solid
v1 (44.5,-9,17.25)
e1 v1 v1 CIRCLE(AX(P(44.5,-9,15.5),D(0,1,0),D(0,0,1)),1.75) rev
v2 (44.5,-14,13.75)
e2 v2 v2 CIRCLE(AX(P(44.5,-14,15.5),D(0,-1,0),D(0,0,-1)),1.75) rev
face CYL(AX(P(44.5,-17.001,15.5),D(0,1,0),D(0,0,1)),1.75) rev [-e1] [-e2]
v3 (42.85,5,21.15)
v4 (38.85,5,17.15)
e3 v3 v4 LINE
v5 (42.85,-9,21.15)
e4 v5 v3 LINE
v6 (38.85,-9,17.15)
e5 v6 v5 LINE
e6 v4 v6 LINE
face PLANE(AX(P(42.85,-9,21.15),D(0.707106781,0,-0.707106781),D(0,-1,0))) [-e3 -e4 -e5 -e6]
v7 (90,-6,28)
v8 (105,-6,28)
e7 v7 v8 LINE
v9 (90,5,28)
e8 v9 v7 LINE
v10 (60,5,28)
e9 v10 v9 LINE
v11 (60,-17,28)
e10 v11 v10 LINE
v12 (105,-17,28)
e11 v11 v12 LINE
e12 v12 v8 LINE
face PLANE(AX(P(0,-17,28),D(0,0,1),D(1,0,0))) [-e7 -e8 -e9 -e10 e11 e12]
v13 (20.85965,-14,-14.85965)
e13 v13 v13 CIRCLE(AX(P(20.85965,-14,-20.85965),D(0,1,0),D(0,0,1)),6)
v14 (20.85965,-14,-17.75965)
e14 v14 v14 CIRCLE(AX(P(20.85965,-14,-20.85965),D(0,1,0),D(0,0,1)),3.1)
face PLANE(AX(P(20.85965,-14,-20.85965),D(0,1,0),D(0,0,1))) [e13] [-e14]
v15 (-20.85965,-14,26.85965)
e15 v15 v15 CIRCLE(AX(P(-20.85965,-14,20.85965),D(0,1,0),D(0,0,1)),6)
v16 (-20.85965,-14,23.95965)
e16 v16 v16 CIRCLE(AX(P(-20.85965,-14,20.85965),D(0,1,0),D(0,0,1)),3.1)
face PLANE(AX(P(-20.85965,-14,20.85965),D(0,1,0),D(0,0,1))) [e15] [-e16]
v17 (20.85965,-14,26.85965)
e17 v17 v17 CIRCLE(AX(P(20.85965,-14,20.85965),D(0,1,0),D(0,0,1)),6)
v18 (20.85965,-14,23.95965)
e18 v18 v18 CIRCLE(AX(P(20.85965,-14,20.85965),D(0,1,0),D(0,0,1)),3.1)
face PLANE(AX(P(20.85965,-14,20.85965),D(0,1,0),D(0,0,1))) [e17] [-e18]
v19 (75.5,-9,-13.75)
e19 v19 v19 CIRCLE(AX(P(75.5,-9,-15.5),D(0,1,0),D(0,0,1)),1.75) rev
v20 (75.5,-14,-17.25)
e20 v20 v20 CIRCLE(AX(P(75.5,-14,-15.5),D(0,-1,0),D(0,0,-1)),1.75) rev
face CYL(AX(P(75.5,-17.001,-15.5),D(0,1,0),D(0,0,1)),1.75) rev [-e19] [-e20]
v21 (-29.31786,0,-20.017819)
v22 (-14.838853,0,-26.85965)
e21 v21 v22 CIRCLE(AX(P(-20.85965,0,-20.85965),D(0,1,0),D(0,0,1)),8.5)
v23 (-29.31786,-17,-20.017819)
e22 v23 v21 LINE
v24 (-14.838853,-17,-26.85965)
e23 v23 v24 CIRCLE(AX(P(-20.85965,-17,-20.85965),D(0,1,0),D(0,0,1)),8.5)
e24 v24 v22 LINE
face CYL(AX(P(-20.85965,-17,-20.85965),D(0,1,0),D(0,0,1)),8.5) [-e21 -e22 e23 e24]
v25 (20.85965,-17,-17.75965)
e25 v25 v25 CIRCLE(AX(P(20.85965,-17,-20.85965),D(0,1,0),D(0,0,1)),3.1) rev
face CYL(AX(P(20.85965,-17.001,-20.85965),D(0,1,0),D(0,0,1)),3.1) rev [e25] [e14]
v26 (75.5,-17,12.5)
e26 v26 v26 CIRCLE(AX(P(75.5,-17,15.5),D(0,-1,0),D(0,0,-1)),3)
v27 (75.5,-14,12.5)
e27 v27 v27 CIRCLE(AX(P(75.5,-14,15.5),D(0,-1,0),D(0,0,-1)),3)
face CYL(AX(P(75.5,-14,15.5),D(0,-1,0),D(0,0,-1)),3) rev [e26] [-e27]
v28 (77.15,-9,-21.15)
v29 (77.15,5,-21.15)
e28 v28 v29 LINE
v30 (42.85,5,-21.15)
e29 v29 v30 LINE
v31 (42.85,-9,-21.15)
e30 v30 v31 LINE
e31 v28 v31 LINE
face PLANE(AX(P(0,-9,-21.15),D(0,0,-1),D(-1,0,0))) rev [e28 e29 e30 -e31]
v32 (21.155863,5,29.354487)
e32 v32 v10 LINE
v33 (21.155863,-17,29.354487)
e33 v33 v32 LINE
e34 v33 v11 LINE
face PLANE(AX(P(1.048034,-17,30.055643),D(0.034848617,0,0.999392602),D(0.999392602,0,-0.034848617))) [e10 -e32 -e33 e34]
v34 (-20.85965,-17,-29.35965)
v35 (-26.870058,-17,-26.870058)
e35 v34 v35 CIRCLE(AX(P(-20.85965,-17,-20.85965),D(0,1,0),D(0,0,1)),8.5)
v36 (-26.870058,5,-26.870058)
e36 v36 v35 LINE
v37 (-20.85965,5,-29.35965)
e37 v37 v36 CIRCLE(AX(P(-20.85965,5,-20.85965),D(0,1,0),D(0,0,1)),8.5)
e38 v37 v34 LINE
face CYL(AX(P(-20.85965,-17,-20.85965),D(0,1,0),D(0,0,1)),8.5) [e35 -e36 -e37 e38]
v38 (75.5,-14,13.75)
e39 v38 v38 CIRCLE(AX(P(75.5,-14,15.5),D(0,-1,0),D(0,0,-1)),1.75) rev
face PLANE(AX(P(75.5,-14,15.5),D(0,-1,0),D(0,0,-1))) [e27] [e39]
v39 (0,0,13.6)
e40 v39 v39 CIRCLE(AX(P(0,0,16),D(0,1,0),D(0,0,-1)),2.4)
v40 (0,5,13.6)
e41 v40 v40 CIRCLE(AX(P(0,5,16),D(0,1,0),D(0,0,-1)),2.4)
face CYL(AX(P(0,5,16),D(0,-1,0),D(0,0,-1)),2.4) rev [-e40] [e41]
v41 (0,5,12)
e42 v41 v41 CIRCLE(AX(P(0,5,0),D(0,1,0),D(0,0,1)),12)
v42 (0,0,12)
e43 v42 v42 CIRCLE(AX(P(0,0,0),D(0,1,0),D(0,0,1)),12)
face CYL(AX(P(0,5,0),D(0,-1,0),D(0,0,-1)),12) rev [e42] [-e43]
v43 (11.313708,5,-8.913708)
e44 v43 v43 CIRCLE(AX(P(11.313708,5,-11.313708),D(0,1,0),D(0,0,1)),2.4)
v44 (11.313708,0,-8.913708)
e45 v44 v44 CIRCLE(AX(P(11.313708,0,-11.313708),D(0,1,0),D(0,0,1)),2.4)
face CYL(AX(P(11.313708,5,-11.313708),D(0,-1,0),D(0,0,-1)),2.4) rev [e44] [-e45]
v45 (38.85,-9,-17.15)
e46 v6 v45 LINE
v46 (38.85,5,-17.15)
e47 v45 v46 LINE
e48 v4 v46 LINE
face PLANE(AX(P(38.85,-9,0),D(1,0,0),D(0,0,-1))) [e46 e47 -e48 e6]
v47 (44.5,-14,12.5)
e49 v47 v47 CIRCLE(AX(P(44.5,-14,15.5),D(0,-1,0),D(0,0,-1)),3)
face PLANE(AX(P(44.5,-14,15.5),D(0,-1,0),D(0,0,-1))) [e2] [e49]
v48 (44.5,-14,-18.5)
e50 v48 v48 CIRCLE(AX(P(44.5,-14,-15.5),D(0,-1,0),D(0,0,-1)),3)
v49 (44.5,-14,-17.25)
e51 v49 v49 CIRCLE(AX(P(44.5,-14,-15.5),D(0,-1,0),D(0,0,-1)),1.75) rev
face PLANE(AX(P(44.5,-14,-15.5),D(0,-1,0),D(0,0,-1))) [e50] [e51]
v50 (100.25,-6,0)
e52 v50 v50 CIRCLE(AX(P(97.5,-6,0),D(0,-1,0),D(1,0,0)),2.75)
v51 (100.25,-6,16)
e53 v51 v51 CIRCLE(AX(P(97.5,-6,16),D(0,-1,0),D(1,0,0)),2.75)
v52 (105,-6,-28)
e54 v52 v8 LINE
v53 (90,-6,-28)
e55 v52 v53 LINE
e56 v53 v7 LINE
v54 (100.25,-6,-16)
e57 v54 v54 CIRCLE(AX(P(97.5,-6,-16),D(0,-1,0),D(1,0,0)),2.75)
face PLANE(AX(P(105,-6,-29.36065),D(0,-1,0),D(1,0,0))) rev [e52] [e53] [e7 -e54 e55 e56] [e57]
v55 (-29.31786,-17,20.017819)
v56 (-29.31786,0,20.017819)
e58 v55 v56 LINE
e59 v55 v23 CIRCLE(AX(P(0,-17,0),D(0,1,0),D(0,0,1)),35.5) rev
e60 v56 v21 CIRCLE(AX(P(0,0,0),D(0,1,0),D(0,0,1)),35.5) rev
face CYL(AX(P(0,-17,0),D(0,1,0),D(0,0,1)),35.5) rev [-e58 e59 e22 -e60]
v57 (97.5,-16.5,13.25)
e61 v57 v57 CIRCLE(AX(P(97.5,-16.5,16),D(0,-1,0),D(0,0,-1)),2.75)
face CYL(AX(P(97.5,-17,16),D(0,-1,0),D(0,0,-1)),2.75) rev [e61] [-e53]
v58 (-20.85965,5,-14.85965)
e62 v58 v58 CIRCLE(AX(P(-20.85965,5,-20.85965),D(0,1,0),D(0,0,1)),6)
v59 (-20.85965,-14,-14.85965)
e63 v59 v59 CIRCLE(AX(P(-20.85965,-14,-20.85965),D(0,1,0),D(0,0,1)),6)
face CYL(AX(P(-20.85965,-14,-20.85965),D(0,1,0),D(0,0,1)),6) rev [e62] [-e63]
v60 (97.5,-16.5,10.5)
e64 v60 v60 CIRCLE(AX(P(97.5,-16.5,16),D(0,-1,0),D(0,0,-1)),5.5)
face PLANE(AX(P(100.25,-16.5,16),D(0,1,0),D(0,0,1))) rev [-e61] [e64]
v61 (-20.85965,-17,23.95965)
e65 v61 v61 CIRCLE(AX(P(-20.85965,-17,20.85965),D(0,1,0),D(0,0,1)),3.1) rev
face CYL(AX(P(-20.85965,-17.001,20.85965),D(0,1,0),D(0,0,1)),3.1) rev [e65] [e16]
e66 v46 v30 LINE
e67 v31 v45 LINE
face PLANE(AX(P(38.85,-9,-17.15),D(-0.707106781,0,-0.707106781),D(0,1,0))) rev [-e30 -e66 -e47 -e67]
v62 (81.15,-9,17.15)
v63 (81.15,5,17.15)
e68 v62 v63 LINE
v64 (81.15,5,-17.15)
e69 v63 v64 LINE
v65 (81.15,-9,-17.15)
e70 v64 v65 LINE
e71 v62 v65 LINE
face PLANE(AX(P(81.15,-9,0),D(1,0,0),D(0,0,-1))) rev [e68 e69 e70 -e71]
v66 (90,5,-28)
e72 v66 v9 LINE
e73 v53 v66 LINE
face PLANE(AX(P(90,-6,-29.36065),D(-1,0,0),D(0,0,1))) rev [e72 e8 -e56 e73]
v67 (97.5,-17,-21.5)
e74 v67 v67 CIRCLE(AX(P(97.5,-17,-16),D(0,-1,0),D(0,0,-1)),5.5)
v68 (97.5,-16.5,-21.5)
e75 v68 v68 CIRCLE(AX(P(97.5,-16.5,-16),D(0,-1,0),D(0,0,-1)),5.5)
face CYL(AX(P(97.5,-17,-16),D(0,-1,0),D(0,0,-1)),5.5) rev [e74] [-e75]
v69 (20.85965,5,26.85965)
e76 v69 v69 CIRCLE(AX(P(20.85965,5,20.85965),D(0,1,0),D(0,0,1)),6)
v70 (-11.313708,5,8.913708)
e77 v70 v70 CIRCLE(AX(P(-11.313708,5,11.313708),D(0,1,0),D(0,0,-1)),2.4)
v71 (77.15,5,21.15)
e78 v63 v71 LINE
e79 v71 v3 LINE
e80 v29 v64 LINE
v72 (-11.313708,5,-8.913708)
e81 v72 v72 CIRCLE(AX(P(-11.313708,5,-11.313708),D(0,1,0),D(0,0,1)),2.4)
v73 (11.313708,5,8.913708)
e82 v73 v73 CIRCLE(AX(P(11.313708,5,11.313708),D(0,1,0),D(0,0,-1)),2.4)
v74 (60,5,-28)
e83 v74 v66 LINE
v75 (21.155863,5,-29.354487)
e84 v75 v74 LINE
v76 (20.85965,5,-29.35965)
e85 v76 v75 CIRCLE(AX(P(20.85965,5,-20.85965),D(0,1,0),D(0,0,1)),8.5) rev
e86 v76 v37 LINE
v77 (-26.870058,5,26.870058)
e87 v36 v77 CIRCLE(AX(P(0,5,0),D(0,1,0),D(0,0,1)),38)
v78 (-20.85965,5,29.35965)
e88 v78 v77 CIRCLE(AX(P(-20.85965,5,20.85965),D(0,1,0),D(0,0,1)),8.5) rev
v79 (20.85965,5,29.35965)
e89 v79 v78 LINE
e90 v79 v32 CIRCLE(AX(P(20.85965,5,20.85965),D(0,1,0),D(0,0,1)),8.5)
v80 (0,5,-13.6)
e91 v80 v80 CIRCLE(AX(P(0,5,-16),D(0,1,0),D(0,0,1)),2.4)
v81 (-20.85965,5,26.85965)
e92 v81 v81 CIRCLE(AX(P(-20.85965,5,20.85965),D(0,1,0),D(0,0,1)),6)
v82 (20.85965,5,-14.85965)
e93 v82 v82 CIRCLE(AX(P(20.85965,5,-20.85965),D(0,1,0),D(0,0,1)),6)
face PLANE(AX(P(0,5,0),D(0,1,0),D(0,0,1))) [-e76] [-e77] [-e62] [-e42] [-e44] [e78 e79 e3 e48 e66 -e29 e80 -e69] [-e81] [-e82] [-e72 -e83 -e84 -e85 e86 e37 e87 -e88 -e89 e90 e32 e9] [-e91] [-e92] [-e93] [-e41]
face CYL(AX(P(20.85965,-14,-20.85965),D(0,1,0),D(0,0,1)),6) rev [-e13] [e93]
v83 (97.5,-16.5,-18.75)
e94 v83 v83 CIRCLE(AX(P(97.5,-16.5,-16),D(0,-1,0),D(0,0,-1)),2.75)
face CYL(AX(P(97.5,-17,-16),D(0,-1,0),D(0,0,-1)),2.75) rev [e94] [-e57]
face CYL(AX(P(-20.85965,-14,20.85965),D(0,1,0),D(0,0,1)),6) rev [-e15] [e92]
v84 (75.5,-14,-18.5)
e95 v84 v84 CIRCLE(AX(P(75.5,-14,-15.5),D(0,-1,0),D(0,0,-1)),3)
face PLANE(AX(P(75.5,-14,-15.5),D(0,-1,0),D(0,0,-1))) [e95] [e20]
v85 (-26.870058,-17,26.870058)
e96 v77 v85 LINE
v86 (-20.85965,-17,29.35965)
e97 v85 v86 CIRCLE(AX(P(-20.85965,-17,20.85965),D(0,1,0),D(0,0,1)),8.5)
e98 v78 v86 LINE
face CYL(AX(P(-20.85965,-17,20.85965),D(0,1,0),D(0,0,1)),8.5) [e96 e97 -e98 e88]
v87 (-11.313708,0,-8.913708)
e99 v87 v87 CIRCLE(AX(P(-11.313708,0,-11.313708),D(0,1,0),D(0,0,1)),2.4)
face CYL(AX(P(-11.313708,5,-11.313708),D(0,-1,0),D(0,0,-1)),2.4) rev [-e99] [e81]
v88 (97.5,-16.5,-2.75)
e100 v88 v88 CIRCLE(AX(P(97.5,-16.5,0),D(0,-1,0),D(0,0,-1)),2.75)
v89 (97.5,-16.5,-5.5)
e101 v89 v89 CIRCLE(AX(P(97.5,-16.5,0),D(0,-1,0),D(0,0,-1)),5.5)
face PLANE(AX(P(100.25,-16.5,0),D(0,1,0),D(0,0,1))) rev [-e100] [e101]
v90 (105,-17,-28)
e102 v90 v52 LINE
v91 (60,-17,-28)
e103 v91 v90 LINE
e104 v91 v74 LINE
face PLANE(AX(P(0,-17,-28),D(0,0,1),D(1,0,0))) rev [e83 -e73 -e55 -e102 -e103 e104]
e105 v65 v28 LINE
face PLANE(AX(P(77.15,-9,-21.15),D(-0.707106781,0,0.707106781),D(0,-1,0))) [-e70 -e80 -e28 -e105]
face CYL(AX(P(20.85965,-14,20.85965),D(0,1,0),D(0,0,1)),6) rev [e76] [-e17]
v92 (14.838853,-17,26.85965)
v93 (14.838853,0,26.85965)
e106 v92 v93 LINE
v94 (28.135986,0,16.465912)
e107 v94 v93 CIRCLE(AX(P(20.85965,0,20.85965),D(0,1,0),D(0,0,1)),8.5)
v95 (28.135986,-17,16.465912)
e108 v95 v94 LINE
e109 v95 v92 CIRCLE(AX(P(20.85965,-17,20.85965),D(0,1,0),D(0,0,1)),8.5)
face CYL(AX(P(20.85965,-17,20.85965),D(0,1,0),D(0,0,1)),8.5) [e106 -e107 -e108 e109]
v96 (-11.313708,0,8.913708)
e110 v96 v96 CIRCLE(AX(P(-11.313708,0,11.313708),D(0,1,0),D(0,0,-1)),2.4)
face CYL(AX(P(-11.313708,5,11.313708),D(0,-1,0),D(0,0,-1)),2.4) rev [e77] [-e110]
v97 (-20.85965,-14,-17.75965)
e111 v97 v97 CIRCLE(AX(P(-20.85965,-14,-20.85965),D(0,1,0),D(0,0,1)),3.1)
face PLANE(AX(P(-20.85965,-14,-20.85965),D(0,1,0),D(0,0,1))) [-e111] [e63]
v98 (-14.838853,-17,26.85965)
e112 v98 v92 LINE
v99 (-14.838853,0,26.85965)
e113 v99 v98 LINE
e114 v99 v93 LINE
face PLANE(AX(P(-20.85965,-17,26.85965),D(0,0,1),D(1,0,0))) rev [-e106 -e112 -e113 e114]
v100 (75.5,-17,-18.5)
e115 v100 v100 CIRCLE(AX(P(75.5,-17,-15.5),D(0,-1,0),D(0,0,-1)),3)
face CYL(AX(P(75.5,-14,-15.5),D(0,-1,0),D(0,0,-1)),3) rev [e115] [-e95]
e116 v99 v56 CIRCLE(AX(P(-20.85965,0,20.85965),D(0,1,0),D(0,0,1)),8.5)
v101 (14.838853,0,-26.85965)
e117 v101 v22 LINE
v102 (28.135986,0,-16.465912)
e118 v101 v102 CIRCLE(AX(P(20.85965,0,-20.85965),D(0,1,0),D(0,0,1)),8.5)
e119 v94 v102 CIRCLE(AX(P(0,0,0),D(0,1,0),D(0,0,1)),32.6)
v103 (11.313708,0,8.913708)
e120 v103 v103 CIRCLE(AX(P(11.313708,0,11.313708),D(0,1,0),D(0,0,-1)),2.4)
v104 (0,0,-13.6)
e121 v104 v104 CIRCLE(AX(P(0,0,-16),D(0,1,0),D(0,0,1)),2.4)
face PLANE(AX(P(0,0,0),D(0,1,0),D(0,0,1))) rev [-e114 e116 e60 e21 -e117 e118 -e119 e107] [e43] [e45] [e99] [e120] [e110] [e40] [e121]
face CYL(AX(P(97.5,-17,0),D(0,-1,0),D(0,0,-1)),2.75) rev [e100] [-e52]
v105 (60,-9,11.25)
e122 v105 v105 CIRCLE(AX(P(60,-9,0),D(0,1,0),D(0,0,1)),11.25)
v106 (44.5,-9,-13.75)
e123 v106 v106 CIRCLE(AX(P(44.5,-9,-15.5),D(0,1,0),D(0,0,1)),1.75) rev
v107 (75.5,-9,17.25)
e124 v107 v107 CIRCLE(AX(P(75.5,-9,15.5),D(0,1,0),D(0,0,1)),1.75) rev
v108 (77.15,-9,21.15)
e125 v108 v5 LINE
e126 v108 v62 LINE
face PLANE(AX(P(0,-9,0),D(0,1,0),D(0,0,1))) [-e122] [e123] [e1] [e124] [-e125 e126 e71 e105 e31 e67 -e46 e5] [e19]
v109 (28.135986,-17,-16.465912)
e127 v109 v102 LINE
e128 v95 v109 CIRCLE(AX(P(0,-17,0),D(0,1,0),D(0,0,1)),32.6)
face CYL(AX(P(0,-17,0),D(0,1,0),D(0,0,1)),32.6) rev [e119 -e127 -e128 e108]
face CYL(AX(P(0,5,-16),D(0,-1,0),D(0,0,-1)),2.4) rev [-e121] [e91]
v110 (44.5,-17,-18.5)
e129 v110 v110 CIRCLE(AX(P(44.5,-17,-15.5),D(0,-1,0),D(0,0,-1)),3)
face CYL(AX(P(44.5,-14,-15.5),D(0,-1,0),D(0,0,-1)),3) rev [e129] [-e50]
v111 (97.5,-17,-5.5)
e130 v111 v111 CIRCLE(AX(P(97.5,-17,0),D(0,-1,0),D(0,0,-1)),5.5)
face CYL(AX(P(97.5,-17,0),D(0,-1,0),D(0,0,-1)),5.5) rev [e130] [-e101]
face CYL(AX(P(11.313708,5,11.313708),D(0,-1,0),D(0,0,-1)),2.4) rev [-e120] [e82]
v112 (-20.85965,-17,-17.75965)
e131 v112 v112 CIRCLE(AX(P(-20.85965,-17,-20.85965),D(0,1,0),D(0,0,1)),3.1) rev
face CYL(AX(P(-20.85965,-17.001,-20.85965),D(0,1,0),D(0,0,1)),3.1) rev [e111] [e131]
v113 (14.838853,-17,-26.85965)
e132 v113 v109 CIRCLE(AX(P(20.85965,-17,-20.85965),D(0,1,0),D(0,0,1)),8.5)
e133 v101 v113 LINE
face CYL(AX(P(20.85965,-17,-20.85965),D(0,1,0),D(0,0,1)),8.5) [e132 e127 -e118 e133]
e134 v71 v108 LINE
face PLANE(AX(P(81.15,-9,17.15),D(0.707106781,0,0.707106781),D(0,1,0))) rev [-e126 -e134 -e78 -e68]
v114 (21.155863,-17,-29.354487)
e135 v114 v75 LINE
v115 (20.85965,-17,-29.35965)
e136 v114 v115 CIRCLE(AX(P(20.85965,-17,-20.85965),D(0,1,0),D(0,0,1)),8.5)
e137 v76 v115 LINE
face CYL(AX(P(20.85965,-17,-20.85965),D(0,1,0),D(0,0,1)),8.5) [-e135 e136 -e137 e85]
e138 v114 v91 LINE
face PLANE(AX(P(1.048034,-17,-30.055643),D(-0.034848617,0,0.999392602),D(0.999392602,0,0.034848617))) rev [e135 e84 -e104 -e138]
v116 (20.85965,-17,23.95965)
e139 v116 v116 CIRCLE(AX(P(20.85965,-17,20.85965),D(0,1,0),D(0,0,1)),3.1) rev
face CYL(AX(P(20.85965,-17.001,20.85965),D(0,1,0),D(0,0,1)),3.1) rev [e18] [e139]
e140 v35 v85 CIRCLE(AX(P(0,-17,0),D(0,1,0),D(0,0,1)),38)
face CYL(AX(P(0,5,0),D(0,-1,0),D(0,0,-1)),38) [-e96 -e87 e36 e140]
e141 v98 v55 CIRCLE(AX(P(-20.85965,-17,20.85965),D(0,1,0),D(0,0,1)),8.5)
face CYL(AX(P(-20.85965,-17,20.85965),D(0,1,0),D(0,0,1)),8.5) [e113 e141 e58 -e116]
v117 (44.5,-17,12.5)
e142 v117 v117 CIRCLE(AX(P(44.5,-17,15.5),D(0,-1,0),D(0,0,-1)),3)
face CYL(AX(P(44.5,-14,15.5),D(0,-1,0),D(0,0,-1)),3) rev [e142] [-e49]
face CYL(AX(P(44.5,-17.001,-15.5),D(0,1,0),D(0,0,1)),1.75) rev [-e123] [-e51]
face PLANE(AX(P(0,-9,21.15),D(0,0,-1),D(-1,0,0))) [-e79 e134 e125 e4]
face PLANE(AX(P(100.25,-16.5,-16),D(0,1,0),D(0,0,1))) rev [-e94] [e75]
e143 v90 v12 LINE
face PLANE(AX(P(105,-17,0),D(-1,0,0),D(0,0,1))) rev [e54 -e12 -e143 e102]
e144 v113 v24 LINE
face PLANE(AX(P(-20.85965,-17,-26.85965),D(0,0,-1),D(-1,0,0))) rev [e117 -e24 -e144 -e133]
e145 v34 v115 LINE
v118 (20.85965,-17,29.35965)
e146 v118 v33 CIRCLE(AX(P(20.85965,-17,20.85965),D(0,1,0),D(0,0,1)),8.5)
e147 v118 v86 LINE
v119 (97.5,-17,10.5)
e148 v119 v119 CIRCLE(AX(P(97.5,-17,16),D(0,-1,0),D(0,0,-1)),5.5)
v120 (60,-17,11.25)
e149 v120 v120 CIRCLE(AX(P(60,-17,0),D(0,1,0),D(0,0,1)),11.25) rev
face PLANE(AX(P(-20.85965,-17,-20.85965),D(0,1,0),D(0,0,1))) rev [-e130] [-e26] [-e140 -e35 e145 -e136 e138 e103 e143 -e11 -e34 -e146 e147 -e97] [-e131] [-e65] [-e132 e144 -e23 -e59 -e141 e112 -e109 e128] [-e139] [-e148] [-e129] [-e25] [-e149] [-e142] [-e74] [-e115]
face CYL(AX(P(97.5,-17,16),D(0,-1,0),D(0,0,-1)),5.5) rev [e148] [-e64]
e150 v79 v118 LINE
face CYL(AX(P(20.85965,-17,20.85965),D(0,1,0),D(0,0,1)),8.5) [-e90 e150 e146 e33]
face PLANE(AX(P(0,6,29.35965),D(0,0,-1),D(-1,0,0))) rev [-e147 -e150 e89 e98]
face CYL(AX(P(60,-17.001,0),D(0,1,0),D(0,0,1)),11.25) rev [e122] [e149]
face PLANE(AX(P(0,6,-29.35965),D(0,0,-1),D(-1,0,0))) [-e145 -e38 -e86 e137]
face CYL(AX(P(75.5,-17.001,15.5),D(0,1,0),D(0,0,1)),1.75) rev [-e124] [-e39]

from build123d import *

# Parameters (mm, degrees)
SKETCH_1_R                   = 38
SKETCH_1_R_2                 = 12
SKETCH_1_R_3                 = 2.4
SKETCH_1_R_4                 = 3.1
EXTRUDE_1_DEPTH              = 5
SKETCH_2_R                   = 8.5
EXTRUDE_2_DEPTH              = 17
SKETCH_3_R                   = 6
CUT_EXTRUDE_1_DEPTH          = 19
CUT_EXTRUDE_2_REACH          = 59
SKETCH_4_R                   = 3.1
CUT_EXTRUDE_START            = 6
CUT_EXTRUDE_3_DEPTH          = 6
EXTRUDE_START                = -22
EXTRUDE_5_DEPTH              = 22
SKETCH_9_W                   = 41.71930009
SKETCH_9_H                   = 2.5
EXTRUDE_6_DEPTH              = 17
CUT_EXTRUDE_4_REACH          = 122.848
SKETCH_10_W                  = 15
SKETCH_10_H                  = 11
SKETCH_11_W                  = 42.3
SKETCH_11_H                  = 42.3
SKETCH_11_R                  = 11.25
CUT_EXTRUDE_5_DEPTH          = 14
CUT_EXTRUDE_6_REACH          = 113.225
SKETCH_11_2_R                = 1.75
SKETCH_11_2_R_2              = 11.25
CHAMFER_2_SIZE               = 4
HOLE_WIZARD_M5_2_D           = 5.5
HOLE_WIZARD_M5_2_CBORE_D     = 11
HOLE_WIZARD_M5_2_CBORE_DEPTH = 0.5
SKETCH_13_R                  = 3
CUT_EXTRUDE_7_DEPTH          = 3


# Read off the part's stored shape, not the designer's step: 凸台-拉伸5
with BuildPart() as part:
    # 草图1 → 凸台-拉伸1 (new body)
    with BuildSketch(Plane(origin=(0, 0, 0), x_dir=(1, 0, 0), z_dir=(0, 1, 0))):
        with Locations(Location((0, 0, 0), (0, 0, 270))):
            Circle(SKETCH_1_R)
        with Locations(Location((0, 0, 0), (0, 0, 270))):
            Circle(SKETCH_1_R_2, mode=Mode.SUBTRACT)
        with Locations(Location((-11.313708499, 11.313708499, 0), (0, 0, 270))):
            Circle(SKETCH_1_R_3, mode=Mode.SUBTRACT)
        with Locations(Location((0, 16, 0), (0, 0, 270))):
            Circle(SKETCH_1_R_3, mode=Mode.SUBTRACT)
        with Locations(Location((11.313708499, 11.313708499, 0), (0, 0, 270))):
            Circle(SKETCH_1_R_3, mode=Mode.SUBTRACT)
        with Locations(Location((11.313708499, -11.313708499, 0), (0, 0, 90))):
            Circle(SKETCH_1_R_3, mode=Mode.SUBTRACT)
        with Locations(Location((-11.313708499, -11.313708499, 0), (0, 0, 90))):
            Circle(SKETCH_1_R_3, mode=Mode.SUBTRACT)
        with Locations(Location((0, -16, 0), (0, 0, 90))):
            Circle(SKETCH_1_R_3, mode=Mode.SUBTRACT)
        with Locations(Location((-20.859650045, 20.859650045, 0), (0, 0, 270))):
            Circle(SKETCH_1_R_4, mode=Mode.SUBTRACT)
        with Locations(Location((20.859650045, 20.859650045, 0), (0, 0, 270))):
            Circle(SKETCH_1_R_4, mode=Mode.SUBTRACT)
        with Locations(Location((20.859650045, -20.859650045, 0), (0, 0, 270))):
            Circle(SKETCH_1_R_4, mode=Mode.SUBTRACT)
        with Locations(Location((-20.859650045, -20.859650045, 0), (0, 0, 270))):
            Circle(SKETCH_1_R_4, mode=Mode.SUBTRACT)
    extrude(amount=EXTRUDE_1_DEPTH)

    # 草图2 → 凸台-拉伸2 (add)
    with BuildSketch(Plane(origin=(0, 0, 0), x_dir=(1, 0, 0), z_dir=(0, 1, 0))):
        with Locations(Location((-20.859650045, 20.859650045, 0), (0, 0, 270))):
            Circle(SKETCH_2_R)
        with Locations(Location((20.859650045, 20.859650045, 0), (0, 0, 270))):
            Circle(SKETCH_2_R)
        with Locations(Location((20.859650045, -20.859650045, 0), (0, 0, 270))):
            Circle(SKETCH_2_R)
        with Locations(Location((-20.859650045, -20.859650045, 0), (0, 0, 270))):
            Circle(SKETCH_2_R)
    extrude(amount=-EXTRUDE_2_DEPTH)

    # 草图3 → 切除-拉伸1 (cut)
    with BuildSketch(Plane(origin=(0, 5, 0), x_dir=(1, 0, 0), z_dir=(0, 1, 0))):
        with Locations(Location((-20.859650045, 20.859650045, 0), (0, 0, 270))):
            Circle(SKETCH_3_R)
        with Locations(Location((20.859650045, 20.859650045, 0), (0, 0, 270))):
            Circle(SKETCH_3_R)
        with Locations(Location((20.859650045, -20.859650045, 0), (0, 0, 270))):
            Circle(SKETCH_3_R)
        with Locations(Location((-20.859650045, -20.859650045, 0), (0, 0, 270))):
            Circle(SKETCH_3_R)
    extrude(amount=-CUT_EXTRUDE_1_DEPTH, mode=Mode.SUBTRACT)

    # 草图4 → 切除-拉伸2 (cut, up to next)
    with BuildSketch(Plane(origin=(0, -14, 0), x_dir=(1, 0, 0), z_dir=(0, 1, 0)), mode=Mode.PRIVATE) as cut_extrude_2_sk1:
        with Locations(Location((-20.859650045, 20.859650045, 0), (0, 0, 270))):
            Circle(SKETCH_4_R)
    cut_extrude_2_tool1 = extrude(cut_extrude_2_sk1.sketch, amount=-CUT_EXTRUDE_2_REACH, mode=Mode.PRIVATE) & part.part
    # 草图4 → 切除-拉伸2 (cut, up to next)
    with BuildSketch(Plane(origin=(0, -14, 0), x_dir=(1, 0, 0), z_dir=(0, 1, 0)), mode=Mode.PRIVATE) as cut_extrude_2_sk2:
        with Locations(Location((20.859650045, 20.859650045, 0), (0, 0, 270))):
            Circle(SKETCH_4_R)
    cut_extrude_2_tool2 = extrude(cut_extrude_2_sk2.sketch, amount=-CUT_EXTRUDE_2_REACH, mode=Mode.PRIVATE) & part.part
    # 草图4 → 切除-拉伸2 (cut, up to next)
    with BuildSketch(Plane(origin=(0, -14, 0), x_dir=(1, 0, 0), z_dir=(0, 1, 0)), mode=Mode.PRIVATE) as cut_extrude_2_sk3:
        with Locations(Location((20.859650045, -20.859650045, 0), (0, 0, 270))):
            Circle(SKETCH_4_R)
    cut_extrude_2_tool3 = extrude(cut_extrude_2_sk3.sketch, amount=-CUT_EXTRUDE_2_REACH, mode=Mode.PRIVATE) & part.part
    # 草图4 → 切除-拉伸2 (cut, up to next)
    with BuildSketch(Plane(origin=(0, -14, 0), x_dir=(1, 0, 0), z_dir=(0, 1, 0)), mode=Mode.PRIVATE) as cut_extrude_2_sk4:
        with Locations(Location((-20.859650045, -20.859650045, 0), (0, 0, 270))):
            Circle(SKETCH_4_R)
    cut_extrude_2_tool4 = extrude(cut_extrude_2_sk4.sketch, amount=-CUT_EXTRUDE_2_REACH, mode=Mode.PRIVATE) & part.part
    add(cut_extrude_2_tool1.solids().sort_by_distance((-20.85965, -14, -20.85965))[0], mode=Mode.SUBTRACT)
    add(cut_extrude_2_tool2.solids().sort_by_distance((20.85965, -14, -20.85965))[0], mode=Mode.SUBTRACT)
    add(cut_extrude_2_tool3.solids().sort_by_distance((20.85965, -14, 20.85965))[0], mode=Mode.SUBTRACT)
    add(cut_extrude_2_tool4.solids().sort_by_distance((-20.85965, -14, 20.85965))[0], mode=Mode.SUBTRACT)

    # 草图7 → 切除-拉伸3 (cut)
    with BuildSketch(Plane(origin=(0, 0, 0), x_dir=(1, 0, 0), z_dir=(0, 1, 0)).offset(CUT_EXTRUDE_START)):
        with BuildLine():
            Line((-20.859650045, -29.359650045), (20.859650045, -29.359650045))
            ThreePointArc((20.859650045, -29.359650045), (24.11245922, -28.712626071), (26.870057685, -26.870057685))
            ThreePointArc((26.870057685, -26.870057685), (0, -38), (-26.870057685, -26.870057685))
            ThreePointArc((-26.870057685, -26.870057685), (-24.11245922, -28.712626071), (-20.859650045, -29.359650045))
        make_face()
        with BuildLine():
            Line((-20.859650045, 29.359650045), (20.859650045, 29.359650045))
            ThreePointArc((20.859650045, 29.359650045), (24.11245922, 28.712626071), (26.870057685, 26.870057685))
            ThreePointArc((26.870057685, 26.870057685), (0, 38), (-26.870057685, 26.870057685))
            ThreePointArc((-26.870057685, 26.870057685), (-24.11245922, 28.712626071), (-20.859650045, 29.359650045))
        make_face()
    extrude(amount=-CUT_EXTRUDE_3_DEPTH, mode=Mode.SUBTRACT)

    # 凸台-拉伸5 outline → 凸台-拉伸5 (add)
    with BuildSketch(Plane(origin=(0, 5, 0), x_dir=(1, 0, 0), z_dir=(0, 1, 0)).offset(EXTRUDE_START)):
        with BuildLine():
            ThreePointArc((-26.870057685, 26.870057685), (-38, 0), (-26.870057685, -26.870057685))
            ThreePointArc((-26.870057685, -26.870057685), (-28.864243736, -23.719104512), (-29.317860266, -20.017818797))
            ThreePointArc((-29.317860266, -20.017818797), (-35.5, 0), (-29.317860266, 20.017818797))
            ThreePointArc((-29.317860266, 20.017818797), (-28.864243736, 23.719104512), (-26.870057685, 26.870057685))
        make_face()
        with BuildLine():
            ThreePointArc((28.135986341, 16.465912444), (32.6, 0), (28.135986341, -16.465912444))
            ThreePointArc((28.135986341, -16.465912444), (28.333920326, -24.907524026), (21.155863292, -29.354487166))
            Line((21.155863292, -29.354487166), (60, -28))
            Line((60, -28), (105, -28))
            Line((105, -28), (105, 28))
            Line((105, 28), (60, 28))
            Line((60, 28), (21.155863292, 29.354487166))
            ThreePointArc((21.155863292, 29.354487166), (28.333920326, 24.907524026), (28.135986341, 16.465912444))
        make_face()
    extrude(amount=EXTRUDE_5_DEPTH)

    # 草图9 → 凸台-拉伸6 (add)
    with BuildSketch(Plane.XZ):
        with Locations((0, 28.109650045)):
            Rectangle(SKETCH_9_W, SKETCH_9_H)
        with Locations((0, -28.109650045)):
            Rectangle(SKETCH_9_W, SKETCH_9_H)
    extrude(amount=EXTRUDE_6_DEPTH)

    # 草图10 → 切除-拉伸4 (cut, up to next)
    with BuildSketch(Plane.XY.offset(28), mode=Mode.PRIVATE) as cut_extrude_4_sk1:
        with Locations((97.5, -0.5)):
            Rectangle(SKETCH_10_W, SKETCH_10_H)
    cut_extrude_4_tool1 = extrude(cut_extrude_4_sk1.sketch, amount=-CUT_EXTRUDE_4_REACH, mode=Mode.PRIVATE) & part.part
    add(cut_extrude_4_tool1.solids().sort_by_distance((97.5, -0.5, 28))[0], mode=Mode.SUBTRACT)

    # 草图11 → 切除-拉伸5 (cut)
    with BuildSketch(Plane(origin=(0, 5, 0), x_dir=(1, 0, 0), z_dir=(0, 1, 0))):
        with Locations((60, 0)):
            Rectangle(SKETCH_11_W, SKETCH_11_H)
        with Locations(Location((60, 0, 0), (0, 0, 270))):
            Circle(SKETCH_11_R, mode=Mode.SUBTRACT)
    extrude(amount=-CUT_EXTRUDE_5_DEPTH, mode=Mode.SUBTRACT)

    # 草图11<2> → 切除-拉伸6 (cut, up to next)
    with BuildSketch(Plane(origin=(0, 5, 0), x_dir=(1, 0, 0), z_dir=(0, 1, 0)), mode=Mode.PRIVATE) as cut_extrude_6_sk1:
        with Locations(Location((44.5, 15.5, 0), (0, 0, 270))):
            Circle(SKETCH_11_2_R)
    cut_extrude_6_tool1 = extrude(cut_extrude_6_sk1.sketch, amount=-CUT_EXTRUDE_6_REACH, mode=Mode.PRIVATE) & part.part
    # 草图11<2> → 切除-拉伸6 (cut, up to next)
    with BuildSketch(Plane(origin=(0, 5, 0), x_dir=(1, 0, 0), z_dir=(0, 1, 0)), mode=Mode.PRIVATE) as cut_extrude_6_sk2:
        with Locations(Location((60, 0, 0), (0, 0, 270))):
            Circle(SKETCH_11_2_R_2)
    cut_extrude_6_tool2 = extrude(cut_extrude_6_sk2.sketch, amount=-CUT_EXTRUDE_6_REACH, mode=Mode.PRIVATE) & part.part
    # 草图11<2> → 切除-拉伸6 (cut, up to next)
    with BuildSketch(Plane(origin=(0, 5, 0), x_dir=(1, 0, 0), z_dir=(0, 1, 0)), mode=Mode.PRIVATE) as cut_extrude_6_sk3:
        with Locations(Location((75.5, 15.5, 0), (0, 0, 270))):
            Circle(SKETCH_11_2_R)
    cut_extrude_6_tool3 = extrude(cut_extrude_6_sk3.sketch, amount=-CUT_EXTRUDE_6_REACH, mode=Mode.PRIVATE) & part.part
    # 草图11<2> → 切除-拉伸6 (cut, up to next)
    with BuildSketch(Plane(origin=(0, 5, 0), x_dir=(1, 0, 0), z_dir=(0, 1, 0)), mode=Mode.PRIVATE) as cut_extrude_6_sk4:
        with Locations(Location((75.5, -15.5, 0), (0, 0, 270))):
            Circle(SKETCH_11_2_R)
    cut_extrude_6_tool4 = extrude(cut_extrude_6_sk4.sketch, amount=-CUT_EXTRUDE_6_REACH, mode=Mode.PRIVATE) & part.part
    # 草图11<2> → 切除-拉伸6 (cut, up to next)
    with BuildSketch(Plane(origin=(0, 5, 0), x_dir=(1, 0, 0), z_dir=(0, 1, 0)), mode=Mode.PRIVATE) as cut_extrude_6_sk5:
        with Locations(Location((44.5, -15.5, 0), (0, 0, 270))):
            Circle(SKETCH_11_2_R)
    cut_extrude_6_tool5 = extrude(cut_extrude_6_sk5.sketch, amount=-CUT_EXTRUDE_6_REACH, mode=Mode.PRIVATE) & part.part
    add(cut_extrude_6_tool1.solids().sort_by_distance((44.5, 5, -15.5))[0], mode=Mode.SUBTRACT)
    add(cut_extrude_6_tool2.solids().sort_by_distance((60, 5, 0))[0], mode=Mode.SUBTRACT)
    add(cut_extrude_6_tool3.solids().sort_by_distance((75.5, 5, -15.5))[0], mode=Mode.SUBTRACT)
    add(cut_extrude_6_tool4.solids().sort_by_distance((75.5, 5, 15.5))[0], mode=Mode.SUBTRACT)
    add(cut_extrude_6_tool5.solids().sort_by_distance((44.5, 5, 15.5))[0], mode=Mode.SUBTRACT)

    # 倒角2
    chamfer_2_edges = [part.edges().sort_by_distance(p)[0] for p in [
        (38.85, -2, -21.15),
        (81.15, -2, -21.15),
        (81.15, -2, 21.15),
        (38.85, -2, 21.15),
    ]]
    chamfer(chamfer_2_edges, length=CHAMFER_2_SIZE)

    # M5 六角头螺栓的柱形沉头孔2 (through all)
    with Locations(Plane(origin=(0, -17, 0), x_dir=(-1, 0, 0), z_dir=(0, -1, 0))):
        with Locations((-97.5, -16), (-97.5, 0), (-97.5, 16)):
            CounterBoreHole(HOLE_WIZARD_M5_2_D / 2, HOLE_WIZARD_M5_2_CBORE_D / 2, HOLE_WIZARD_M5_2_CBORE_DEPTH)

    # 草图13 → 切除-拉伸7 (cut)
    with BuildSketch(Plane.XZ.offset(17)):
        with Locations(Location((44.5, 15.5, 0), (0, 0, 270))):
            Circle(SKETCH_13_R)
        with Locations(Location((75.5, 15.5, 0), (0, 0, 270))):
            Circle(SKETCH_13_R)
        with Locations(Location((75.5, -15.5, 0), (0, 0, 270))):
            Circle(SKETCH_13_R)
        with Locations(Location((44.5, -15.5, 0), (0, 0, 270))):
            Circle(SKETCH_13_R)
    extrude(amount=-CUT_EXTRUDE_7_DEPTH, mode=Mode.SUBTRACT)


solid = part.part
